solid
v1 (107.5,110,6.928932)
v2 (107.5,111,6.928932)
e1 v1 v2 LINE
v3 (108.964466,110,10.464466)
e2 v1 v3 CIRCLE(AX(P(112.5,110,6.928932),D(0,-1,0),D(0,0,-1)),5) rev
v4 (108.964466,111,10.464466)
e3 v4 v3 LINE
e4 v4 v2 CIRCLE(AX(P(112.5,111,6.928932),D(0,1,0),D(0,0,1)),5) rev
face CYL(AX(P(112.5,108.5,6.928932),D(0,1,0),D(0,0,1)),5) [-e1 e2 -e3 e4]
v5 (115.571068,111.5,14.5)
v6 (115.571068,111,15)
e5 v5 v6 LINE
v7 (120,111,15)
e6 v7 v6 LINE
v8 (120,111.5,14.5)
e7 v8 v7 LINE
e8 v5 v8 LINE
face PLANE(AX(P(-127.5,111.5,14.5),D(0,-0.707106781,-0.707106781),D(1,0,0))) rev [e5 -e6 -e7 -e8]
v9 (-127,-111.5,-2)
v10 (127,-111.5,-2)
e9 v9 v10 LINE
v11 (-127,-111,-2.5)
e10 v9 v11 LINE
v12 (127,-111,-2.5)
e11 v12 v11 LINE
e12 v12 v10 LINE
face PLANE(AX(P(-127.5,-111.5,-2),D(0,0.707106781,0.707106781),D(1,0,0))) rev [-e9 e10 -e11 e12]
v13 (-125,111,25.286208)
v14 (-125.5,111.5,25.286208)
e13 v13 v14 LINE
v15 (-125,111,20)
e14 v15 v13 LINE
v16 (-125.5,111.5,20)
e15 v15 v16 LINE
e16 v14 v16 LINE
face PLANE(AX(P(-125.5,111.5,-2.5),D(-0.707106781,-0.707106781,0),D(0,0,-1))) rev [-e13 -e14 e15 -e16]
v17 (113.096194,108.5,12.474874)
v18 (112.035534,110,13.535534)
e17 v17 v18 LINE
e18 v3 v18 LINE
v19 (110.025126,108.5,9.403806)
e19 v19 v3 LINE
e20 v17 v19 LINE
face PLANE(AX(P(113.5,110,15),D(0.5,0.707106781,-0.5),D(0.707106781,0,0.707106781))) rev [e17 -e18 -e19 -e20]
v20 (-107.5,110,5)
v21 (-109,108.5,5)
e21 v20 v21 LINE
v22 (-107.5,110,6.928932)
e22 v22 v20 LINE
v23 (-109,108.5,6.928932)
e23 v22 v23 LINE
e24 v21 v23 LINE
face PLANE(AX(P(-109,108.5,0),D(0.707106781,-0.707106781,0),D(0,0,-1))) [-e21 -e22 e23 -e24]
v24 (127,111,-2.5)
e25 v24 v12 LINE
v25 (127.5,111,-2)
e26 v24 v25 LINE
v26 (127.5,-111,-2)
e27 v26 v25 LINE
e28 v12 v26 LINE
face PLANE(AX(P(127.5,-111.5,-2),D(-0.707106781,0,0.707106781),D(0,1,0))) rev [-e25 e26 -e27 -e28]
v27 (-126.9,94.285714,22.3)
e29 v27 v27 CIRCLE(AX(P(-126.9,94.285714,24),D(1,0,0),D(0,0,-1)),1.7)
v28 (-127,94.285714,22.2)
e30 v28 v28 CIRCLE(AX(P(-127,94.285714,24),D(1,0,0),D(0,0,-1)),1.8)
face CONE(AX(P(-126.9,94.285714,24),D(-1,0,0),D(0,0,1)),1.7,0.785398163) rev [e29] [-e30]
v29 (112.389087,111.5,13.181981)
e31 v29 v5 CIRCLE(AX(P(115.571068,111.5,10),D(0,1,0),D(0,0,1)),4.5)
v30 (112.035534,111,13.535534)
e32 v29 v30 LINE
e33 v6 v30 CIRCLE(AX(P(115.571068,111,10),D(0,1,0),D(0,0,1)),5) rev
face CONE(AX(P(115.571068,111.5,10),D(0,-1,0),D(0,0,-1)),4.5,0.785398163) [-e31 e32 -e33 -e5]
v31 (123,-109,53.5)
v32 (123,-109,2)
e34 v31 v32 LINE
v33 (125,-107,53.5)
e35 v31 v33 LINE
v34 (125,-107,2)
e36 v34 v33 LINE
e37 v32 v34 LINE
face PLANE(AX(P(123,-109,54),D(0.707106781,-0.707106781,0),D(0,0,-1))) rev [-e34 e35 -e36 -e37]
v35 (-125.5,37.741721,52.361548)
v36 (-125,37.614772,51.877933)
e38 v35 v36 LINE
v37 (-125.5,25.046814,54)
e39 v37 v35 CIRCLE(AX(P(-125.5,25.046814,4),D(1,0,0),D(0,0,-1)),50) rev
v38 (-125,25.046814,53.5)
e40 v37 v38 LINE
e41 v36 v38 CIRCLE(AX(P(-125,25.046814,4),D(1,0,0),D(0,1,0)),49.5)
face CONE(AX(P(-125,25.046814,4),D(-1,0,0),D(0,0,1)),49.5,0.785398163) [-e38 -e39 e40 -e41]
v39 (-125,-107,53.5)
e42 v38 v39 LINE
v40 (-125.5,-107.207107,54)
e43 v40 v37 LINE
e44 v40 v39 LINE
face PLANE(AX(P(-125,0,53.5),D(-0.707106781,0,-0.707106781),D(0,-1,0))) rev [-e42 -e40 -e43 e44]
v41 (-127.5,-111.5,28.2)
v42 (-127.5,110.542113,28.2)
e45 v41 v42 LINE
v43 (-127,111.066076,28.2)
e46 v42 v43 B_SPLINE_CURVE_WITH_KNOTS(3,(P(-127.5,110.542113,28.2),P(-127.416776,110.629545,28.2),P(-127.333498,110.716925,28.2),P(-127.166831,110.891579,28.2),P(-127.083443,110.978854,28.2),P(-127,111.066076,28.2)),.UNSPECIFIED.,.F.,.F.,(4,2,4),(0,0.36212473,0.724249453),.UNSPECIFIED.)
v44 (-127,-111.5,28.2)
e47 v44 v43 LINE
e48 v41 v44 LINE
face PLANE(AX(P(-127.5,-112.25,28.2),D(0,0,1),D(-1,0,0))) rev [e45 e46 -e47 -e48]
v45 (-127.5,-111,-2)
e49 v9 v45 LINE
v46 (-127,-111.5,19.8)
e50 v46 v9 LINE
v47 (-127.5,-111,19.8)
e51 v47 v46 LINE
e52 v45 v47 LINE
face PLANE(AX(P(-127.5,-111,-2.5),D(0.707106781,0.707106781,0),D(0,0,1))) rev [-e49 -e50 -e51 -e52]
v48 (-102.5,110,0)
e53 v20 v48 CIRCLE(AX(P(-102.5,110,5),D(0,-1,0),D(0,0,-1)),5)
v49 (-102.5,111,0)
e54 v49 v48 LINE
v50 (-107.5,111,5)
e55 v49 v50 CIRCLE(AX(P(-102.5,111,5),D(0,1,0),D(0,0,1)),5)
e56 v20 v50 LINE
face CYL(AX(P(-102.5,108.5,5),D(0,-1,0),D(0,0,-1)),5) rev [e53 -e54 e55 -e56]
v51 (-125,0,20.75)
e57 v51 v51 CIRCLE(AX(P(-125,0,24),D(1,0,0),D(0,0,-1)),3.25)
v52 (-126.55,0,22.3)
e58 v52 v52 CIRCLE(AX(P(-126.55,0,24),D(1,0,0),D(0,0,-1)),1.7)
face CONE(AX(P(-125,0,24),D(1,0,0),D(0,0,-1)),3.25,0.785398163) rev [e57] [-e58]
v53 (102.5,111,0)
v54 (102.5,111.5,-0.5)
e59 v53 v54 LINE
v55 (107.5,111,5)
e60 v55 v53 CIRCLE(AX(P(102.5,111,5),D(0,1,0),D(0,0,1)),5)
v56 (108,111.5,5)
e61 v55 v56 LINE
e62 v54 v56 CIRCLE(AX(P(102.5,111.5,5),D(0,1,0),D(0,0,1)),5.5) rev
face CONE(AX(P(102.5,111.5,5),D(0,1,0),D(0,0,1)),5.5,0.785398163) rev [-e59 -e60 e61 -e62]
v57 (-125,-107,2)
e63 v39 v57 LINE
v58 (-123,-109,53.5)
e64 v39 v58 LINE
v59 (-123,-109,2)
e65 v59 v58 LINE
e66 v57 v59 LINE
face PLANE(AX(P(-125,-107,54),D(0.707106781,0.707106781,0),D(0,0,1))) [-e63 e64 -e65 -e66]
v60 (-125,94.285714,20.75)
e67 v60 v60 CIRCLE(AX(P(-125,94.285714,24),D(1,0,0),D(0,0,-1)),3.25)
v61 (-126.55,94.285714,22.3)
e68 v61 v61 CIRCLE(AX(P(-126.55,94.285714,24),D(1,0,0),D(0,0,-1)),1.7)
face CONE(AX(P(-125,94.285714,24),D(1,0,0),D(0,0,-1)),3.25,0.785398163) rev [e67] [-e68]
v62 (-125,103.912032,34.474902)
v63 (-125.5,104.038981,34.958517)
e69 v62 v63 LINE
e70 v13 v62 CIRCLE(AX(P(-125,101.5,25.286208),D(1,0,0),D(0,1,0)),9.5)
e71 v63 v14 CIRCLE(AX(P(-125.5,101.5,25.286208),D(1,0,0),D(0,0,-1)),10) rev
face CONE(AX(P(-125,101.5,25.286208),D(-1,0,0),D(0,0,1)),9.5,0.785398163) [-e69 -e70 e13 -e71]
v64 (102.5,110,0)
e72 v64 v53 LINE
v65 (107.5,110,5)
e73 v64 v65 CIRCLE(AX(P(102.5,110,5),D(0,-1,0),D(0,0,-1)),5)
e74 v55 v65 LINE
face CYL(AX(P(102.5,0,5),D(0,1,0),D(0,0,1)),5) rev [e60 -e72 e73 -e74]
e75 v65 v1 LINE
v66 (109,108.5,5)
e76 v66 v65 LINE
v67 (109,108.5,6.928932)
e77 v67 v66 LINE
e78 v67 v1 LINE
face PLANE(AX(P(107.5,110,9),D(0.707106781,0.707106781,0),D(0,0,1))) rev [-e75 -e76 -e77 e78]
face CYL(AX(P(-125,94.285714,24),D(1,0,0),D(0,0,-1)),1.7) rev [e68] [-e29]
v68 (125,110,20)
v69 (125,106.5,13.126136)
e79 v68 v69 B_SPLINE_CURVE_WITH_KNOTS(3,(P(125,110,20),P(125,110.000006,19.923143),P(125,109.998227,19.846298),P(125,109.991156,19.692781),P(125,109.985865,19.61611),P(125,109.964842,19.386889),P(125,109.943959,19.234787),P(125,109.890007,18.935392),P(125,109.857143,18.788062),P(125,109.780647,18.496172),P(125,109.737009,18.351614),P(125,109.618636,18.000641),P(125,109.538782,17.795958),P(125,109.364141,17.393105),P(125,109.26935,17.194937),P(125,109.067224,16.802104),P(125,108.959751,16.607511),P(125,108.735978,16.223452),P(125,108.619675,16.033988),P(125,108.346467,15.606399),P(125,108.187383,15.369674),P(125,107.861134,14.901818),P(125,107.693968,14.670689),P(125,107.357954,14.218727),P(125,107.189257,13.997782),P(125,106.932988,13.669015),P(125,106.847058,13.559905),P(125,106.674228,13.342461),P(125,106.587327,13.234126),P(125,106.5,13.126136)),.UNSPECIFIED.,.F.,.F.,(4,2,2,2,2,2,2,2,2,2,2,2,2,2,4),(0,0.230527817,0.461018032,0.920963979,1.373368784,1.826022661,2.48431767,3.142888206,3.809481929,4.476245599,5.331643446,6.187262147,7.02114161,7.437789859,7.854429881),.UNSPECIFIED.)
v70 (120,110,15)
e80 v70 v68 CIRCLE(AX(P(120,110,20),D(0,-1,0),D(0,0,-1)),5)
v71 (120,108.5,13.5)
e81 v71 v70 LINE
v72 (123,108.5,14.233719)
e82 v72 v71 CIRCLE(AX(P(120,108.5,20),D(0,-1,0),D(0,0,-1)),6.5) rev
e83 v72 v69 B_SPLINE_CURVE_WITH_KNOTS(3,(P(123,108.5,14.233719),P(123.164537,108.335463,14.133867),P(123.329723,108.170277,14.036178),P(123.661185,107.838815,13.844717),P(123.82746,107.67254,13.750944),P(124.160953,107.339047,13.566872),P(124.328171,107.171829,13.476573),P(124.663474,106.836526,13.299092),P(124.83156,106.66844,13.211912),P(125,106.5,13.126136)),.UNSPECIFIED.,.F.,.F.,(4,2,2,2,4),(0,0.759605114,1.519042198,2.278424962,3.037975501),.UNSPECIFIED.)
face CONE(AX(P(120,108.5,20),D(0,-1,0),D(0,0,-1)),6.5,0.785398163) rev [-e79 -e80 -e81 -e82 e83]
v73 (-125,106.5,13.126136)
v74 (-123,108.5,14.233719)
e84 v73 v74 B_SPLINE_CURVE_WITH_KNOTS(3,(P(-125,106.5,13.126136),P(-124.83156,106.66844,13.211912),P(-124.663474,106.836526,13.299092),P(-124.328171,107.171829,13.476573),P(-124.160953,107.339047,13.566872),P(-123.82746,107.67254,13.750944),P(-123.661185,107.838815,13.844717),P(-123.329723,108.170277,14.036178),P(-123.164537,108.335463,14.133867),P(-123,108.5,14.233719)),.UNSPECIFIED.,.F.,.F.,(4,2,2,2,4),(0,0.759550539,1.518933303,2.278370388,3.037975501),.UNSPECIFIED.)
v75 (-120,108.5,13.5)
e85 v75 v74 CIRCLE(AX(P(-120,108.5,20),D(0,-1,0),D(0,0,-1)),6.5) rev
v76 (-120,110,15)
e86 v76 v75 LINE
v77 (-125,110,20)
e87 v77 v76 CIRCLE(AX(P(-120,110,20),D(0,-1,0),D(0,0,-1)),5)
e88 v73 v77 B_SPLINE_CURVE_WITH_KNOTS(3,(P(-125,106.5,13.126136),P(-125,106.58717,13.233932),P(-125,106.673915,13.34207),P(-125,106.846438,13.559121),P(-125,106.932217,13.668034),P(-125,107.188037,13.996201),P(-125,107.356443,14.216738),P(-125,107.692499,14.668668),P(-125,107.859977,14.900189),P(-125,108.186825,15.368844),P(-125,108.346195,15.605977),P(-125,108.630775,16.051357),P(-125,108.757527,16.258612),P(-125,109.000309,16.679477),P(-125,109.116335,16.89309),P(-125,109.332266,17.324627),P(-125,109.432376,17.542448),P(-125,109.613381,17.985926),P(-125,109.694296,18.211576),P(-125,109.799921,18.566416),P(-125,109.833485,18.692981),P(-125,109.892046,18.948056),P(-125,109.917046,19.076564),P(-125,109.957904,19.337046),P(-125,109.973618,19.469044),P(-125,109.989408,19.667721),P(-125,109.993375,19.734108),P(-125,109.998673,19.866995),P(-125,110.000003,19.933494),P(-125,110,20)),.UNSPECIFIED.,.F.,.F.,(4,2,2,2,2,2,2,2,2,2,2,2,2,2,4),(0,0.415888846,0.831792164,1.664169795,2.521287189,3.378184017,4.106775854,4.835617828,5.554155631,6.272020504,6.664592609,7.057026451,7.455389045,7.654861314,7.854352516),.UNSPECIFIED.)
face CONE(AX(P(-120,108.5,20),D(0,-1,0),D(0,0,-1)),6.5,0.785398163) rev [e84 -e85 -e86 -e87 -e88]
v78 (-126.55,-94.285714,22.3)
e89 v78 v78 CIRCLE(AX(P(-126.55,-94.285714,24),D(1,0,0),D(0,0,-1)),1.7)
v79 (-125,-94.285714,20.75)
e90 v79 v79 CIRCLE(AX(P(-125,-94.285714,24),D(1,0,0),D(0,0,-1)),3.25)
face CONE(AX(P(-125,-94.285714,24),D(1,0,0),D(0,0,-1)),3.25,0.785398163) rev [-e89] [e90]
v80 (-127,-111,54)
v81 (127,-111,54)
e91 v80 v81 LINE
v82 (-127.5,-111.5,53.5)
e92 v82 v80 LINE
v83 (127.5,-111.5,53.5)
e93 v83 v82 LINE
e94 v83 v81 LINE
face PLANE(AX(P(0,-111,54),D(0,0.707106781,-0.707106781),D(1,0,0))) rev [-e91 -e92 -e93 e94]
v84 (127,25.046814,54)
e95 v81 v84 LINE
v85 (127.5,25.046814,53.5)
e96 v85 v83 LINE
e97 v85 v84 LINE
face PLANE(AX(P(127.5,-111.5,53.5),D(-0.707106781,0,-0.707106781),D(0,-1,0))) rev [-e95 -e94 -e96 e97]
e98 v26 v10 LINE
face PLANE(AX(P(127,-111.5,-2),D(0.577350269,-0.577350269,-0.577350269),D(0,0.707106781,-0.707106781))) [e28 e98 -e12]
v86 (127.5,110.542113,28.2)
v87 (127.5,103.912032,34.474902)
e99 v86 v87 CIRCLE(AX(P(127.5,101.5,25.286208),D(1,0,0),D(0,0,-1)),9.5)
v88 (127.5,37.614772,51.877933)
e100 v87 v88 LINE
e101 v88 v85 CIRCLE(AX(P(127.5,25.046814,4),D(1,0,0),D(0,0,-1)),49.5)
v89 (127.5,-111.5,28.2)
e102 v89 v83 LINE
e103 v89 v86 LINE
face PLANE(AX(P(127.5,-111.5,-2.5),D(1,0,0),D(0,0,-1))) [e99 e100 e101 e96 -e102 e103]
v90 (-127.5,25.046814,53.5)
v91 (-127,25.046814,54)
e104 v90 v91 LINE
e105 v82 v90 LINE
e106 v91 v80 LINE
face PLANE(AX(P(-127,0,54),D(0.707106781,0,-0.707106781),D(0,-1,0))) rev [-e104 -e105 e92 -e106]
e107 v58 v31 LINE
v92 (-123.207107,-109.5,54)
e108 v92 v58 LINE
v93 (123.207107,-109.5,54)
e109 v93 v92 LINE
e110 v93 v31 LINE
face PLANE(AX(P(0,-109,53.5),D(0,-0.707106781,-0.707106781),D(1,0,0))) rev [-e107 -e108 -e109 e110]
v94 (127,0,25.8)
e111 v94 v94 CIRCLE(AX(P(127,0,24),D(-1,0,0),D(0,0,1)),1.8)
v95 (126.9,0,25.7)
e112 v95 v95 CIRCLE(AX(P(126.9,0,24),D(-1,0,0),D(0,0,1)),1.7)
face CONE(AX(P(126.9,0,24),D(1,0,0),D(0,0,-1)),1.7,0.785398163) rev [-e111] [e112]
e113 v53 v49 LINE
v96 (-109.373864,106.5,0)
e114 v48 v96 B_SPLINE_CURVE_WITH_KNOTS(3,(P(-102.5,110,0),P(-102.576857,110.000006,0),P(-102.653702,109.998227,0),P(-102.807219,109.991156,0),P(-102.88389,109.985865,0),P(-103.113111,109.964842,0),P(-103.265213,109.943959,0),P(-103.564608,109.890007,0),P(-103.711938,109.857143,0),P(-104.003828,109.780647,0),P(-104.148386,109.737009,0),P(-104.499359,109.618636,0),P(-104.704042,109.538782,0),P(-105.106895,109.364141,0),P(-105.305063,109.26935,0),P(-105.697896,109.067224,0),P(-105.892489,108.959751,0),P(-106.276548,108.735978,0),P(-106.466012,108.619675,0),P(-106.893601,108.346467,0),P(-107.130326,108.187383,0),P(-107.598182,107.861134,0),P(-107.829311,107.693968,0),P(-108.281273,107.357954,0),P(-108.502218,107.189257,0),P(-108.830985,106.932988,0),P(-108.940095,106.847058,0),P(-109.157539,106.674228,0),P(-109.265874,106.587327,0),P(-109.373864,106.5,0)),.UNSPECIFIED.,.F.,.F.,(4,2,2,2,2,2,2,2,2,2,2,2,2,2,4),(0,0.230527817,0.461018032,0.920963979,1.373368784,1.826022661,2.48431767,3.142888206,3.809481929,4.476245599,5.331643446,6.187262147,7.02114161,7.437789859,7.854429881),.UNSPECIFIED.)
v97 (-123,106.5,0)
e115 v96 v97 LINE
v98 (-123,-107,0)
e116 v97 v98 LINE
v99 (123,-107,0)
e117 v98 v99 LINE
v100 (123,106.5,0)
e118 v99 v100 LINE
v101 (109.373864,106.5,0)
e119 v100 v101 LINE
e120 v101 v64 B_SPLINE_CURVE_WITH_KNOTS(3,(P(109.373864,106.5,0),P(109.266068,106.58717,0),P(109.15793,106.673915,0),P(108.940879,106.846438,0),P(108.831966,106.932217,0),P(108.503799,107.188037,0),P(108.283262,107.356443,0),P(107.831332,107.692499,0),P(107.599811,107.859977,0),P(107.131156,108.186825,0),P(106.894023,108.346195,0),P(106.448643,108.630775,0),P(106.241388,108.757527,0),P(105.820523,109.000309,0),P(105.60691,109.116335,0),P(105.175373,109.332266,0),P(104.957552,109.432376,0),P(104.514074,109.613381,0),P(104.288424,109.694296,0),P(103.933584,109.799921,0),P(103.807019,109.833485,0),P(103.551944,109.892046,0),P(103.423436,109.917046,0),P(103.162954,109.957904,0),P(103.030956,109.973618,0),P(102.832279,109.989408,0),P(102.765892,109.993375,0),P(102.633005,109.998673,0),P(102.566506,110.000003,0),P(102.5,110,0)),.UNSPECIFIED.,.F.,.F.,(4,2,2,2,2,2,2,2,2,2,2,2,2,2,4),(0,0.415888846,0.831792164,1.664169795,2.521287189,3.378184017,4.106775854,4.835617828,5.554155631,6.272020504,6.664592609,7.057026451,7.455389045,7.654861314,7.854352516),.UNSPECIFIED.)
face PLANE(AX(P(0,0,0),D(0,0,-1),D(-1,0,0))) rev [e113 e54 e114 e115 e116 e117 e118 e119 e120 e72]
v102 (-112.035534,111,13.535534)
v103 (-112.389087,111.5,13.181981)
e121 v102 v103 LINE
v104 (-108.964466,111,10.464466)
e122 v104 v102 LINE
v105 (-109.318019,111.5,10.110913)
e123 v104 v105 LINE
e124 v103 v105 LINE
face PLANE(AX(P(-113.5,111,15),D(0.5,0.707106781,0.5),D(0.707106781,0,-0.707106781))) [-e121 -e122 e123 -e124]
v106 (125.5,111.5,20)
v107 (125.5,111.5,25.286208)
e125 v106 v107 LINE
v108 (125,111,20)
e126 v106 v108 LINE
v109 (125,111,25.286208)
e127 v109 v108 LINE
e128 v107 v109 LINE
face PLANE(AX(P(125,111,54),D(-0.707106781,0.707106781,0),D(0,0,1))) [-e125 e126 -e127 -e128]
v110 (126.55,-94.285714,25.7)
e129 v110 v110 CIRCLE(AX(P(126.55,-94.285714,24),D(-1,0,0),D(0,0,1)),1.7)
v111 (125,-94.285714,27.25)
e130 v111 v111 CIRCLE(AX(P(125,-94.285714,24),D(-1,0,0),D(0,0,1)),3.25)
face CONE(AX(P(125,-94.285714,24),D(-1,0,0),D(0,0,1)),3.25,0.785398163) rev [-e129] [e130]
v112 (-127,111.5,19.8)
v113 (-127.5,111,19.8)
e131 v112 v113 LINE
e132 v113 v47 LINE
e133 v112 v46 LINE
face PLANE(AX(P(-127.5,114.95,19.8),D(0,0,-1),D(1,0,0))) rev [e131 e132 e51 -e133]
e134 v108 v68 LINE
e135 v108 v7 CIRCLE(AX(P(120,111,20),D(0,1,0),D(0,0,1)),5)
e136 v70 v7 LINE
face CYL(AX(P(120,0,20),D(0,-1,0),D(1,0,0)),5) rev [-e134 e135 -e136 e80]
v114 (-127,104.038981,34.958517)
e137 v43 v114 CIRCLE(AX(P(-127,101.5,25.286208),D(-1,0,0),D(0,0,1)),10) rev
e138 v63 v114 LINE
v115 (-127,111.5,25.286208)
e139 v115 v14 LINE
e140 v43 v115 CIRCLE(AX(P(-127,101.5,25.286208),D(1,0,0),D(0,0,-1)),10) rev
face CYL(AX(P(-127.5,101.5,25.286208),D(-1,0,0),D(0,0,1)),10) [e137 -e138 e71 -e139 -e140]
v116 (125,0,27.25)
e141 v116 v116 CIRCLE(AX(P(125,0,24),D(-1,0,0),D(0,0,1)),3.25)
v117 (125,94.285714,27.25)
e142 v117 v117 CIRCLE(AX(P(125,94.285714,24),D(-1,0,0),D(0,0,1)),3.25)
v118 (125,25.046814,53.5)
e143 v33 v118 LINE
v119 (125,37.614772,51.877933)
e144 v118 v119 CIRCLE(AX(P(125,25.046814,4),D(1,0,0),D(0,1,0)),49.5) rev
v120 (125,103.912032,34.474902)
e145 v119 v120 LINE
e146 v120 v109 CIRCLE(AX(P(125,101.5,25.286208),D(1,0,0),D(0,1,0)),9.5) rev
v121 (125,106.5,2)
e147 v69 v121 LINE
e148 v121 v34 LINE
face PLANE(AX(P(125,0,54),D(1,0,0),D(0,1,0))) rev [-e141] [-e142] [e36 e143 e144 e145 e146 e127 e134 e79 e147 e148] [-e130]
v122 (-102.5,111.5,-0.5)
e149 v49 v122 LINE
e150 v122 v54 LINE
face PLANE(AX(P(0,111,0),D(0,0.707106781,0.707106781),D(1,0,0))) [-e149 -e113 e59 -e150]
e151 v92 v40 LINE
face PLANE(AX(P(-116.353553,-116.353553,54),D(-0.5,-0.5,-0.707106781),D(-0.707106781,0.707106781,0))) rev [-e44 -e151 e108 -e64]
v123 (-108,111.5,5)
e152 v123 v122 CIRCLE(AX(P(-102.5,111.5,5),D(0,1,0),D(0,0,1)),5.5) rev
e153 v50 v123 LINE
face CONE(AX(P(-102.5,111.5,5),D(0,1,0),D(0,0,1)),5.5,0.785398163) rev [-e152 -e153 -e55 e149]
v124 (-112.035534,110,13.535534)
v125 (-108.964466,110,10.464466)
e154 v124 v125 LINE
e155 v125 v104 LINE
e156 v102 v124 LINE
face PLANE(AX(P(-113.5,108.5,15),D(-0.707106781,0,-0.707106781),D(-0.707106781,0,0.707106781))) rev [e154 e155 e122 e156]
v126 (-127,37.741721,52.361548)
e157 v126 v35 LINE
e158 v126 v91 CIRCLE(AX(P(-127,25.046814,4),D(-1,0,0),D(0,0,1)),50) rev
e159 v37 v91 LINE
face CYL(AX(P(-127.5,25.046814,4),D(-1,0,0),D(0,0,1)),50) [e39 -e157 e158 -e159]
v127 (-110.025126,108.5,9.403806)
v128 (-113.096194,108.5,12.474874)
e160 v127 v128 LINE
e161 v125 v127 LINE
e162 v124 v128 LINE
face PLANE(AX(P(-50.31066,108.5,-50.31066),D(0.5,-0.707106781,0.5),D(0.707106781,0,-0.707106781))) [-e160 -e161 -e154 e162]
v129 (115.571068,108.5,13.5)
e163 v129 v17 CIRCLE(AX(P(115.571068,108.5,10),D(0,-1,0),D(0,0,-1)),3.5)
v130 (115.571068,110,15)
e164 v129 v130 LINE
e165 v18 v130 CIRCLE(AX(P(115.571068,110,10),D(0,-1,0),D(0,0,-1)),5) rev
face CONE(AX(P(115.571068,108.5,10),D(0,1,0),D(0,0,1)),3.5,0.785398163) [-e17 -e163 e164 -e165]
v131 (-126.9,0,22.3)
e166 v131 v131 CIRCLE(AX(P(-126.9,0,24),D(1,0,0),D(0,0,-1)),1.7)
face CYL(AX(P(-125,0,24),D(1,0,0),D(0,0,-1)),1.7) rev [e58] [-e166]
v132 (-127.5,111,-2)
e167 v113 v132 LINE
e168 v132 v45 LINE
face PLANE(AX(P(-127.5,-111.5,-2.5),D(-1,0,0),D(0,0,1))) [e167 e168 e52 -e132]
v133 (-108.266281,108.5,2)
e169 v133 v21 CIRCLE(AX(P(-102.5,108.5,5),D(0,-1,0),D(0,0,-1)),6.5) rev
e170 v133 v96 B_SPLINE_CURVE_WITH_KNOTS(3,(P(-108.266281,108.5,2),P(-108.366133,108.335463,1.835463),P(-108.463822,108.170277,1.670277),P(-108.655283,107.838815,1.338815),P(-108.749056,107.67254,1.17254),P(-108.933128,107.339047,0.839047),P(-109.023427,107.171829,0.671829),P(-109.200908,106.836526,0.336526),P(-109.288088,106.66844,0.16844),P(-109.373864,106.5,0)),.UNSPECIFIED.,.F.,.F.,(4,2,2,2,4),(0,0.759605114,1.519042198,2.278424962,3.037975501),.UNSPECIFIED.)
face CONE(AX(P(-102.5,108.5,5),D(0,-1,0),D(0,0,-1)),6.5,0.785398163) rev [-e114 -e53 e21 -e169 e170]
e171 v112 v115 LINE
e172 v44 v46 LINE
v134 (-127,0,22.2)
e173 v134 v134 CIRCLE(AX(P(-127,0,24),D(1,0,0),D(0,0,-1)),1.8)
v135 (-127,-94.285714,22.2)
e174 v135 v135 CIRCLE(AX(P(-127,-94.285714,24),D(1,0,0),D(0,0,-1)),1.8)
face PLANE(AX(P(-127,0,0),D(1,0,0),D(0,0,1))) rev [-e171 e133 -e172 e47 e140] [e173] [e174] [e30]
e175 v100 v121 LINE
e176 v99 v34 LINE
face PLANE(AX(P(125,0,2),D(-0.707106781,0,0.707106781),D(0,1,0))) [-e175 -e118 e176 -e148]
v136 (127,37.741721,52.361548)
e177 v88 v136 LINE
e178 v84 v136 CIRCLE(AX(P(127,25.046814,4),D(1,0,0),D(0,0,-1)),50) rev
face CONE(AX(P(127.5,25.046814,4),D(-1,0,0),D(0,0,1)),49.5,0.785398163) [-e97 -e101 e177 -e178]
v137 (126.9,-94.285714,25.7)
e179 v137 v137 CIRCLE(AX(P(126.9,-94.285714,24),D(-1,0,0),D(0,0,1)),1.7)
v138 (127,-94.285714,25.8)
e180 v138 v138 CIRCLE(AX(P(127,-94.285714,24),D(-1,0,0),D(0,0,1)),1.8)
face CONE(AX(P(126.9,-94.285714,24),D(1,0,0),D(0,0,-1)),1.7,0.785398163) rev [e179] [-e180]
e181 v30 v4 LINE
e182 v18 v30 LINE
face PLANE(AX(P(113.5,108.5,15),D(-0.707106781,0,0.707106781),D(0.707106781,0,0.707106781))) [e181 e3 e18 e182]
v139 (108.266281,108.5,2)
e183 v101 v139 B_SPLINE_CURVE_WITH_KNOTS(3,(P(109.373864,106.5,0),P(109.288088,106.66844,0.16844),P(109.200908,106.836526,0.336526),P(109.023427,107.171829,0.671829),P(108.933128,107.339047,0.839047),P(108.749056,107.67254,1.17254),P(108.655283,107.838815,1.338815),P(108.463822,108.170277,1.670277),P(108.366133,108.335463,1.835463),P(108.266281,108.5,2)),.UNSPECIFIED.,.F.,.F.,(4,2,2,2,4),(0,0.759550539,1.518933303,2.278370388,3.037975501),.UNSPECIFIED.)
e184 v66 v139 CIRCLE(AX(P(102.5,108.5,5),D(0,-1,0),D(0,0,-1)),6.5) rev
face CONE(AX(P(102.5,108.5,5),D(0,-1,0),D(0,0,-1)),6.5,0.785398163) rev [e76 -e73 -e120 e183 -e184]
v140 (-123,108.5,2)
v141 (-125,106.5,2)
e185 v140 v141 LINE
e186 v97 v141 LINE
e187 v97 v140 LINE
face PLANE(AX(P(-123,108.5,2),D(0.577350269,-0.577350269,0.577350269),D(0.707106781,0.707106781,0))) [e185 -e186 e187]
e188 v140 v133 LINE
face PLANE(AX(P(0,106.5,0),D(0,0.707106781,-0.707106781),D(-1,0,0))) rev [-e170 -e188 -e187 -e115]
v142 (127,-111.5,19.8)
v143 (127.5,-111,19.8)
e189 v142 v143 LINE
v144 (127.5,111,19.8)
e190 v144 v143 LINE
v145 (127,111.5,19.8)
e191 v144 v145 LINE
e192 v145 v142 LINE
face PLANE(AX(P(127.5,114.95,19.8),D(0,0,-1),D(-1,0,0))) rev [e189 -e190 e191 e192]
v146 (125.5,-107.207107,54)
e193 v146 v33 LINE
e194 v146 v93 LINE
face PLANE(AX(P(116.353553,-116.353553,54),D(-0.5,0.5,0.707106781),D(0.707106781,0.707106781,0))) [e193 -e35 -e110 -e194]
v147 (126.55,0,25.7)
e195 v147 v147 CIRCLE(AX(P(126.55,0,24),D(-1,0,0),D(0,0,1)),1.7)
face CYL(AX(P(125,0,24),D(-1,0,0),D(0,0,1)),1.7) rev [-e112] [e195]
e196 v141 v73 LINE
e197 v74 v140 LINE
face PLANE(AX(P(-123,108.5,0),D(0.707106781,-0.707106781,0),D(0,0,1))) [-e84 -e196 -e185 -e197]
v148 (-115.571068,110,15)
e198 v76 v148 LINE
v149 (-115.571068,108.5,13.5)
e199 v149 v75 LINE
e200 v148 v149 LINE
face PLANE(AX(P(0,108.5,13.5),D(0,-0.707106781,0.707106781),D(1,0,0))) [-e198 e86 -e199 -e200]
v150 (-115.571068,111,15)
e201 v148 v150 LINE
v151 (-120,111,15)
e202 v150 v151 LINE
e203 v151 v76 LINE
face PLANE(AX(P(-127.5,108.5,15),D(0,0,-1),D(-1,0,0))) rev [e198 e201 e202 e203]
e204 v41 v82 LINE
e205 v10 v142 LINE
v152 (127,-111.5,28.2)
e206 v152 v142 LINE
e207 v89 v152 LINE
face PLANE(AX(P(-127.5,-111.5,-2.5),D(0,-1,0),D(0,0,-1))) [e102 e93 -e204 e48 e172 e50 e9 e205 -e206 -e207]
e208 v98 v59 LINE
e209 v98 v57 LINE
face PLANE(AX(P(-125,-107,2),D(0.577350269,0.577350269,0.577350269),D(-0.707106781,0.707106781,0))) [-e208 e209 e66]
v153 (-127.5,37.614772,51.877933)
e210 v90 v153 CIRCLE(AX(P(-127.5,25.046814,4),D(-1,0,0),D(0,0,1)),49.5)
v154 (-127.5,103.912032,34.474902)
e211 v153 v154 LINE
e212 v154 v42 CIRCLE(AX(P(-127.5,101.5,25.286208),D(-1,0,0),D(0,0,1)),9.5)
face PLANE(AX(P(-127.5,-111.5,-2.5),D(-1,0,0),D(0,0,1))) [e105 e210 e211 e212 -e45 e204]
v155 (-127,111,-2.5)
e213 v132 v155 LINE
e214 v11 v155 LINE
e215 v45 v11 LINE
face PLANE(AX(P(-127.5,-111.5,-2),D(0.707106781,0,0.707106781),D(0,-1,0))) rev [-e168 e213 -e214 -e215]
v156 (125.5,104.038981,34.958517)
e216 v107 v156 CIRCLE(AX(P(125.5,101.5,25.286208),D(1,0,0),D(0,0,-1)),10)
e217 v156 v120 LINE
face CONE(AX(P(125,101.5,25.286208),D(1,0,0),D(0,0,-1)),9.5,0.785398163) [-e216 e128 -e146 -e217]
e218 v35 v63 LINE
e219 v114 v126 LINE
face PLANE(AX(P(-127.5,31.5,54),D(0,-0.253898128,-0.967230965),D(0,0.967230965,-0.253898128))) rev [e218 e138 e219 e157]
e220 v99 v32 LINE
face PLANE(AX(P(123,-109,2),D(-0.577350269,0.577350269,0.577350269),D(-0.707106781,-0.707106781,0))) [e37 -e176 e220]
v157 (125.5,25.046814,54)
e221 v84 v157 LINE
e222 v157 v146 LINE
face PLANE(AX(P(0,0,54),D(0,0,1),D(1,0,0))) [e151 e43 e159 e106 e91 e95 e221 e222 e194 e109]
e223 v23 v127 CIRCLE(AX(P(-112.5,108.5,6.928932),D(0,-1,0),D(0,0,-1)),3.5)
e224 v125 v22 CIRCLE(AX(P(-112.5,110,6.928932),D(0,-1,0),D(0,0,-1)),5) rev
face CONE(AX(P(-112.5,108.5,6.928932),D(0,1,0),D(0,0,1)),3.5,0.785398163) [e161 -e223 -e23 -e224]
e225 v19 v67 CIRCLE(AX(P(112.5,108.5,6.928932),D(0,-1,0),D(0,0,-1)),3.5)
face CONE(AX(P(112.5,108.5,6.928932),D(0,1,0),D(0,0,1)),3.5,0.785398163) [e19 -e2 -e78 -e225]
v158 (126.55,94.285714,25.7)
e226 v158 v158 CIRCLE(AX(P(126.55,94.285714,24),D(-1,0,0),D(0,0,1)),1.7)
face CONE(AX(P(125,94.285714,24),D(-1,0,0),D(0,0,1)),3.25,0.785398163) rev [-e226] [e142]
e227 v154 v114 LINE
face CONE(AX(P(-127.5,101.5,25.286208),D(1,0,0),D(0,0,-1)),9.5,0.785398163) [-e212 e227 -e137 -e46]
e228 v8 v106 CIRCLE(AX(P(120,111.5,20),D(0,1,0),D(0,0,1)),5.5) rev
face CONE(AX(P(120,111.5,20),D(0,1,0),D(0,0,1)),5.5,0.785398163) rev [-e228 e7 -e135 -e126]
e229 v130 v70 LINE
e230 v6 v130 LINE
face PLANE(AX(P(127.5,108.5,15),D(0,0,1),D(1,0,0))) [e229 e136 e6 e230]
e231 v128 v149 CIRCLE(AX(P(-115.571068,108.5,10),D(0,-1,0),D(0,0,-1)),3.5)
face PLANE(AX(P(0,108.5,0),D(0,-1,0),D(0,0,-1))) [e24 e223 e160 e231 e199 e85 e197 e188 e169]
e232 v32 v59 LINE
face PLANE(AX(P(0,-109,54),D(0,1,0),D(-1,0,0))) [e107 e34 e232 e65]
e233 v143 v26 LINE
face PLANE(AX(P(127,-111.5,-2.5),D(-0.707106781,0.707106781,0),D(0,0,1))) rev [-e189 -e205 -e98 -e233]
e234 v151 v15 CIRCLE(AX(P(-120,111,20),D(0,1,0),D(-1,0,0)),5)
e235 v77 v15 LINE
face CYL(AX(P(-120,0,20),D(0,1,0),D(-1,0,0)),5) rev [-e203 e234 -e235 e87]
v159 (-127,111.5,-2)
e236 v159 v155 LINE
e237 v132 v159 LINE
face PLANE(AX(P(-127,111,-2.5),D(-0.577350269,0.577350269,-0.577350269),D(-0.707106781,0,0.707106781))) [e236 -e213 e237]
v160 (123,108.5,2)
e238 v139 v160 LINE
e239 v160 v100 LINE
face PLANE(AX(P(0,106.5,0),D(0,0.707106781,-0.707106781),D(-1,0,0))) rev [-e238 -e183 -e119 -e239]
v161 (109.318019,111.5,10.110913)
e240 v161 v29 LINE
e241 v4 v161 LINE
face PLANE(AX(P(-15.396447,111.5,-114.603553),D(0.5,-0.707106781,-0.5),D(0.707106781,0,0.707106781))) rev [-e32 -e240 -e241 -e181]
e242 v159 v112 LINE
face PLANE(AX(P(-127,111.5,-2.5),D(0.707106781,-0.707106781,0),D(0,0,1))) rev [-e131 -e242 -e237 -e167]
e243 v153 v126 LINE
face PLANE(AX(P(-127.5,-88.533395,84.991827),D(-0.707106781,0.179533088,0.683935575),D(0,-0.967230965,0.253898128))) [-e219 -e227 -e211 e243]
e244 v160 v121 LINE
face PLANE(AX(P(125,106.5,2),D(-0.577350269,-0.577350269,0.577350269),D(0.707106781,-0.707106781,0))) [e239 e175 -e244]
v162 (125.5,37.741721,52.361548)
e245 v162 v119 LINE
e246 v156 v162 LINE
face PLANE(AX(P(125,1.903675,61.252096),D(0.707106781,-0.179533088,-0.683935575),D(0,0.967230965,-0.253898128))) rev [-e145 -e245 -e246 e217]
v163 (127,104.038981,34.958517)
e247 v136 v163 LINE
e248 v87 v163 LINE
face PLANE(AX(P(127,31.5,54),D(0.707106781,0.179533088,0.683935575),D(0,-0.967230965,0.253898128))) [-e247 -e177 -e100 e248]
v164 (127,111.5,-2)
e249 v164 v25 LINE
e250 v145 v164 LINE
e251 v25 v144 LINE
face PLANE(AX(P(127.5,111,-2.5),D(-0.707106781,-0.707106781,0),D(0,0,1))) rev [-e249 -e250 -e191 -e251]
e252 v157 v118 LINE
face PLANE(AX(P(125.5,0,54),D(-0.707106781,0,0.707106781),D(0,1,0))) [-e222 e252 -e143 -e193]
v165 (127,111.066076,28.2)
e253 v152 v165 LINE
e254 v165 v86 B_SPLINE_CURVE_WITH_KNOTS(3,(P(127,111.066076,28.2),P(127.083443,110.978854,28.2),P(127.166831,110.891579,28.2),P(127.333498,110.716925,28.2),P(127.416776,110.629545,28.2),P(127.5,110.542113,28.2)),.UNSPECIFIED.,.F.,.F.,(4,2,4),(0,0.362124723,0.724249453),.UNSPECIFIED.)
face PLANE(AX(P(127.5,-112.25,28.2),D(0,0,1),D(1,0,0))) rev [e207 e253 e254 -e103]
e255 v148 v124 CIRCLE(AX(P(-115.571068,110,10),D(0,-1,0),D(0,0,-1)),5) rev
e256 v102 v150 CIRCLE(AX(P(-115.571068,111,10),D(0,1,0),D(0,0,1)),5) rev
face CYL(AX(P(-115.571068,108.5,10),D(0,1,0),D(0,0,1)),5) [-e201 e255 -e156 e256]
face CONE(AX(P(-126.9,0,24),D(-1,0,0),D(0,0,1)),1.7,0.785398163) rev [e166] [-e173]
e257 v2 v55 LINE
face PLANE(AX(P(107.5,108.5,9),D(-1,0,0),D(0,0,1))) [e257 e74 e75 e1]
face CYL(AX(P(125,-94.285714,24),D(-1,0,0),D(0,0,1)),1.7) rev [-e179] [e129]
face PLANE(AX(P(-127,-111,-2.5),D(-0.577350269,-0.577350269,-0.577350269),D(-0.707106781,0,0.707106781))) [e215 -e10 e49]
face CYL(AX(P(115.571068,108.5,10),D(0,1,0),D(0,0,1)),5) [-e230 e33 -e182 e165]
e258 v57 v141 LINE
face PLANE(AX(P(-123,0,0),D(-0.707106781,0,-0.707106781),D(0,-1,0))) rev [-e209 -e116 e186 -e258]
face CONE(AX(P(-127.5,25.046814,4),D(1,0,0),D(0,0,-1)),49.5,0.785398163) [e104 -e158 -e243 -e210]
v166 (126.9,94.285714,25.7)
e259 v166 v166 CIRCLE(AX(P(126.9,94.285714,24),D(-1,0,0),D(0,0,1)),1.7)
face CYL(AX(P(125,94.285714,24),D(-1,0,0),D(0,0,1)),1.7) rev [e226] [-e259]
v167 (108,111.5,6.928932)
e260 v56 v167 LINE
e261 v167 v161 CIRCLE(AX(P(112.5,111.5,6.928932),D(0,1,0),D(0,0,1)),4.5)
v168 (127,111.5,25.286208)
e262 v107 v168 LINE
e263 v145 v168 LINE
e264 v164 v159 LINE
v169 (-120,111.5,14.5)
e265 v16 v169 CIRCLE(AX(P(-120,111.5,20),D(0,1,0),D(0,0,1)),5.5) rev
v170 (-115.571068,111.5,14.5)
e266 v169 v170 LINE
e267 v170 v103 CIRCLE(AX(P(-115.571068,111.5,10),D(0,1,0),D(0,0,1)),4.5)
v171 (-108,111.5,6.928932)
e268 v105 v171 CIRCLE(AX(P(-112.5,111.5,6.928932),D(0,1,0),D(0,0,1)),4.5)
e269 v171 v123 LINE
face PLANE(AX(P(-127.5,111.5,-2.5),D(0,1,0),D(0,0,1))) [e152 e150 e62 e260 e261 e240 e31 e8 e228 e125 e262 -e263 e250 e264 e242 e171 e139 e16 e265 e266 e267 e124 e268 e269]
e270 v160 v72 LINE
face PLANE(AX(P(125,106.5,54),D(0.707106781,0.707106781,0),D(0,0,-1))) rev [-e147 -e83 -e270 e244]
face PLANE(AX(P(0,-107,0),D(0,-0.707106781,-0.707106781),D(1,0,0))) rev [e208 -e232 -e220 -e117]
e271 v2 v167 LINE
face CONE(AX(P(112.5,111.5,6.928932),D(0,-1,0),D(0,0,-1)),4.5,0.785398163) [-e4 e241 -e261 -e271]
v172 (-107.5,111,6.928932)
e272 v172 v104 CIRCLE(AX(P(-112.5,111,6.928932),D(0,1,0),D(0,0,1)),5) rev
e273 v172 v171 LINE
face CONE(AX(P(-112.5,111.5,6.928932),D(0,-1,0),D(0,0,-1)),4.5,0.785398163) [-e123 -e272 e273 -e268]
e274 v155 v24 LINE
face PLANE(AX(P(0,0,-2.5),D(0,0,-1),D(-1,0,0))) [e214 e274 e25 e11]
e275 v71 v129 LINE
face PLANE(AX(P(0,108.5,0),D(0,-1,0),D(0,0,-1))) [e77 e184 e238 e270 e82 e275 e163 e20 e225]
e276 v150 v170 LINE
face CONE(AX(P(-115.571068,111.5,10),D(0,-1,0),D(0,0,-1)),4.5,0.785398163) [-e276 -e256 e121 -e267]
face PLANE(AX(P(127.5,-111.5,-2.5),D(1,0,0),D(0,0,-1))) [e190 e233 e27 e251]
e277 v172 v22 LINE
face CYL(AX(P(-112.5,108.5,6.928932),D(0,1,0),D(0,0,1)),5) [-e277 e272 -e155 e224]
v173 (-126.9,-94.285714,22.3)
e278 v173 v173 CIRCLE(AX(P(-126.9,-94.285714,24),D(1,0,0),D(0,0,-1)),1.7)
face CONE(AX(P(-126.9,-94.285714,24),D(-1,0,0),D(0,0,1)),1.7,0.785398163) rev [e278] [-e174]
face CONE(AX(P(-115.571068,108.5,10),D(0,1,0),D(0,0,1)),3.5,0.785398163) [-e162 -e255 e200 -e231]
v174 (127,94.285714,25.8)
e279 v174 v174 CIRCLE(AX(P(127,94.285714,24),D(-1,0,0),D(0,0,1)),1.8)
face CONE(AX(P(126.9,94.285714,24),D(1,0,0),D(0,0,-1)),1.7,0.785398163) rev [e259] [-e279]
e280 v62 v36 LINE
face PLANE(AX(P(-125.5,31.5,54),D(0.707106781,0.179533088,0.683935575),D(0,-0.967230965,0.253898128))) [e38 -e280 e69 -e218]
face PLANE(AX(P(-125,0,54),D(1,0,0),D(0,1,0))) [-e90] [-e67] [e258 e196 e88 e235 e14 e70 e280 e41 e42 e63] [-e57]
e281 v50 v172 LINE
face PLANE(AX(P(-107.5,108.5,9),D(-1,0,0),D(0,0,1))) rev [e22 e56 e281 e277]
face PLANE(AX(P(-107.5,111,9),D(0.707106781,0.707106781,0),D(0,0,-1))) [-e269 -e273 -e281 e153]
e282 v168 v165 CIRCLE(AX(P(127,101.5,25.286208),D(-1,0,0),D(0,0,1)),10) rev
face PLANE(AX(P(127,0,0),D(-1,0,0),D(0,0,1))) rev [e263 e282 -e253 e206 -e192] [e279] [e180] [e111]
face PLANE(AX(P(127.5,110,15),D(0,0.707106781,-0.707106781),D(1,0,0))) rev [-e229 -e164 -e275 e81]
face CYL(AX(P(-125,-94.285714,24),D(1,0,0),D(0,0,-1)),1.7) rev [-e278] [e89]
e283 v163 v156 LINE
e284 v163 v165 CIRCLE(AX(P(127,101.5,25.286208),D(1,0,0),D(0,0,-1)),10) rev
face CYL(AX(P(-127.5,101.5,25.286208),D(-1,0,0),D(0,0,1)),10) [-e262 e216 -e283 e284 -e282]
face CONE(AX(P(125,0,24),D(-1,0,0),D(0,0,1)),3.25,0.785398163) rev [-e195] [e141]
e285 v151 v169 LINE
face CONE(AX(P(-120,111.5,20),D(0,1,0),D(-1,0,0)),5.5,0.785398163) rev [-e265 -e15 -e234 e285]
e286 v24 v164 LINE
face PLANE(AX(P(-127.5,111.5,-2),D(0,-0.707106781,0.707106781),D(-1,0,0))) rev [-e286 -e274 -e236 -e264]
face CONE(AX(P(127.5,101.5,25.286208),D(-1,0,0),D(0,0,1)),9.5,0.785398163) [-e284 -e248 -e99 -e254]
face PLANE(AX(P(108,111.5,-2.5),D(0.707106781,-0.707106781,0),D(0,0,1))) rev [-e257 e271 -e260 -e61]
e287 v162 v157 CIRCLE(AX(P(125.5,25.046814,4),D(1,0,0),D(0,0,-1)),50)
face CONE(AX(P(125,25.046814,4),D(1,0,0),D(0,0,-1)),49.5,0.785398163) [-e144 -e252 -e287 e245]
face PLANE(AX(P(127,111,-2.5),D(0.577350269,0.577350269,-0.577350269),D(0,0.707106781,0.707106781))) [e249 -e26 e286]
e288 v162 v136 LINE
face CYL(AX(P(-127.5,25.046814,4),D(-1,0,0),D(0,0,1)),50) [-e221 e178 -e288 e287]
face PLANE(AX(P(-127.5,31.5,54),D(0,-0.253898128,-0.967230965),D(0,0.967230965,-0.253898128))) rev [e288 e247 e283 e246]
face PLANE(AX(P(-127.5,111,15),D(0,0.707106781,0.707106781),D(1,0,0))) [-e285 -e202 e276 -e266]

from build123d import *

# Parameters (mm, degrees)
SKETCH1_W                                      = 255
SKETCH1_H                                      = 223
BOSS_EXTRUDE1_DEPTH                            = 2.5
SKETCH2_W                                      = 2.5
SKETCH2_H                                      = 223
SKETCH2_W_2                                    = 250
SKETCH2_H_2                                    = 2.5
BOSS_EXTRUDE2_DEPTH                            = 54
FRONT_TAPER_DEPTH                              = 178.776545135
FRONT_TAPER_DEPTH_BACK                         = 178.776545135
HOLD_IN_TAB_DEPTH                              = 3
SKETCH6_W                                      = 8.4
SKETCH6_H                                      = 227.2
MOUNTING_POCKET_DEPTH                          = 284.052115343
CSK_FOR_M3_FLAT_HEAD_MACHINE_SCREW1_AT_2_COUNT = 2
CSK_FOR_M3_FLAT_HEAD_MACHINE_SCREW1_AT_2_PITCH = 94.285714286
CSK_FOR_M3_FLAT_HEAD_MACHINE_SCREW1_AT_3_COUNT = 2
CSK_FOR_M3_FLAT_HEAD_MACHINE_SCREW1_AT_3_PITCH = 188.571428571
FILLET2_R                                      = 5
FILLET3_R                                      = 10
FILLET4_R                                      = 50
INSERT_CHAMS_SIZE                              = 1.5
INSIDE_CHAMS_SIZE                              = 2
DEBURS_SIZE                                    = 0.5


with BuildPart() as part:
    # Sketch1 → Boss-Extrude1 (new body)
    with BuildSketch(Plane.XY):
        Rectangle(SKETCH1_W, SKETCH1_H)
    extrude(amount=-BOSS_EXTRUDE1_DEPTH)

    # Sketch2 → Boss-Extrude2 (add)
    with BuildSketch(Plane.XY):
        with Locations((-126.25, 0)):
            Rectangle(SKETCH2_W, SKETCH2_H)
        with Locations((0, -110.25)):
            Rectangle(SKETCH2_W_2, SKETCH2_H_2)
        with Locations((126.25, 0)):
            Rectangle(SKETCH2_W, SKETCH2_H)
    extrude(amount=BOSS_EXTRUDE2_DEPTH)

    # Sketch5 → Front Taper (cut, two sides: drawn at the far end of the back side and taken through both)
    with BuildSketch(Plane(origin=(0, 0, 0), x_dir=(0, 0, -1), z_dir=(1, 0, 0)).offset(-FRONT_TAPER_DEPTH_BACK)):
        Polygon((-54, 31.5), (-33, 111.5), (-54, 111.5), align=None)
    extrude(amount=FRONT_TAPER_DEPTH + FRONT_TAPER_DEPTH_BACK, mode=Mode.SUBTRACT)

    # Sketch10 → Hold In Tab (add)
    with BuildSketch(Plane(origin=(0, 111.5, 0), x_dir=(1, 0, 0), z_dir=(0, 1, 0))):
        Polygon((127.5, -15), (113.5, -15), (107.5, -9), (107.5, 2.5), (127.5, 2.5), align=None)
    hold_in_tab = extrude(amount=-HOLD_IN_TAB_DEPTH)

    # Hold Tabs: Hold In Tab across plane
    add(hold_in_tab.mirror(Plane(origin=(0, 0, 0), x_dir=(0, 0, 1), z_dir=(1, 0, 0))))

    # Sketch6 → Mounting Pocket (cut, through all)
    with BuildSketch(Plane.ZY.offset(-127)):
        with Locations((24, 1.35)):
            Rectangle(SKETCH6_W, SKETCH6_H)
    mounting_pocket = extrude(amount=-MOUNTING_POCKET_DEPTH, mode=Mode.SUBTRACT)

    # Mounting Pockets: Mounting Pocket across plane
    add(mounting_pocket.mirror(Plane(origin=(0, 0, 0), x_dir=(0, 0, 1), z_dir=(1, 0, 0))), mode=Mode.SUBTRACT)

    # Sketch9 → CSK for M3 Flat Head Machine Screw1 (revolve, cut)
    with BuildSketch(Plane(origin=(125, -94.285714286, 24), x_dir=(0, 0, 1), z_dir=(0, 1, 0))):
        Polygon((0, 0), (0, 2), (1.8, 2), (1.7, 1.9), (1.7, 1.55), (3.25, 0), align=None)
    csk_for_m3_flat_head_machine_screw1 = revolve(axis=Axis((118.65, -94.285714286, 24), (1, 0, 0)), mode=Mode.SUBTRACT)

    # CSK for M3 Flat Head Machine Screw1 at 2: CSK for M3 Flat Head Machine Screw1 ×2
    with Locations(*[(0, i * CSK_FOR_M3_FLAT_HEAD_MACHINE_SCREW1_AT_2_PITCH, 0) for i in range(1, CSK_FOR_M3_FLAT_HEAD_MACHINE_SCREW1_AT_2_COUNT)]):
        add(csk_for_m3_flat_head_machine_screw1, mode=Mode.SUBTRACT)

    # CSK for M3 Flat Head Machine Screw1 at 3: CSK for M3 Flat Head Machine Screw1 ×2
    with Locations(*[(0, i * CSK_FOR_M3_FLAT_HEAD_MACHINE_SCREW1_AT_3_PITCH, 0) for i in range(1, CSK_FOR_M3_FLAT_HEAD_MACHINE_SCREW1_AT_3_COUNT)]):
        add(csk_for_m3_flat_head_machine_screw1, mode=Mode.SUBTRACT)

    # Mounting Screw Holes: CSK for M3 Flat Head Machine Screw1 across plane
    add(csk_for_m3_flat_head_machine_screw1.mirror(Plane(origin=(0, 0, 0), x_dir=(0, 0, 1), z_dir=(1, 0, 0))), mode=Mode.SUBTRACT)

    # Mounting Screw Holes copy 1 sketch → Mounting Screw Holes copy 1 (revolve, cut)
    with BuildSketch(Plane(origin=(-125, 0, 24), x_dir=(0, 0, 1), z_dir=(0, 1, 0))):
        Polygon((0, 0), (0, -2), (1.8, -2), (1.7, -1.9), (1.7, -1.55), (3.25, 0), align=None)
    revolve(axis=Axis((-118.65, 0, 24), (1, 0, 0)), mode=Mode.SUBTRACT)

    # Mounting Screw Holes copy 2 sketch → Mounting Screw Holes copy 2 (revolve, cut)
    with BuildSketch(Plane(origin=(-125, 94.285714286, 24), x_dir=(0, 0, 1), z_dir=(0, 1, 0))):
        Polygon((0, 0), (0, -2), (1.8, -2), (1.7, -1.9), (1.7, -1.55), (3.25, 0), align=None)
    revolve(axis=Axis((-118.65, 94.285714286, 24), (1, 0, 0)), mode=Mode.SUBTRACT)

    # Fillet2
    fillet2_edges = [part.edges().sort_by_distance(p)[0] for p in [
        (125, 110, 15),
        (107.5, 110, 0),
        (107.5, 110, 9),
        (113.5, 110, 15),
        (-125, 110, 15),
        (-107.5, 110, 0),
        (-107.5, 110, 9),
        (-113.5, 110, 15),
    ]]
    fillet(fillet2_edges, radius=FILLET2_R)

    # Fillet3
    fillet3_edges = [part.edges().sort_by_distance(p)[0] for p in [
        (-126.25, 111.5, 33),
        (126.25, 111.5, 33),
    ]]
    fillet(fillet3_edges, radius=FILLET3_R)

    # Fillet4
    fillet4_edges = [part.edges().sort_by_distance(p)[0] for p in [
        (126.25, 31.5, 54),
        (-126.25, 31.5, 54),
    ]]
    fillet(fillet4_edges, radius=FILLET4_R)

    # Insert Chams
    # the kernel refuses this chamfer: 1.5 mm, written as the material it takes off along each edge
    with BuildSketch(Plane(origin=(-112.035533906, 108.5, 13.535533906), x_dir=(0.01944252080601449, 0.9996219169112968, 0.01944252080601441), z_dir=(0.7071067811865461, 0, -0.707106781186549)), Plane(origin=(112.035533906, 108.5, 13.535533906), x_dir=(0.706839436070675, -0.02749587661058209, -0.7068394360706722), z_dir=(-0.7071067811865461, 0, -0.707106781186549))) as insert_chams_piece_1:
        Polygon((INSERT_CHAMS_SIZE * 0.999621916911, -INSERT_CHAMS_SIZE * 0.0274958766106), (-INSERT_CHAMS_SIZE * 0.0274958766106, -INSERT_CHAMS_SIZE * 0.999621916911), (0, 0), align=None)
    extrude(amount=4.343145751, mode=Mode.SUBTRACT)
    with BuildSketch(Plane(origin=(-107.5, 108.5, 6.928932188), x_dir=(0.027495876610582292, 0.9996219169112969, 0), z_dir=(0, 0, -1)), Plane(origin=(107.5, 108.5, 6.928932188), x_dir=(0.9996219169112969, -0.027495876610582292, 0), z_dir=(0, 0, -1))) as insert_chams_piece_2:
        Polygon((INSERT_CHAMS_SIZE * 0.999621916911, -INSERT_CHAMS_SIZE * 0.0274958766106), (-INSERT_CHAMS_SIZE * 0.0274958766106, -INSERT_CHAMS_SIZE * 0.999621916911), (0, 0), align=None)
    extrude(amount=1.928932188, mode=Mode.SUBTRACT)
    with BuildSketch(Plane(origin=(-120, 108.5, 15), x_dir=(0, 0.9996219169112968, 0.027495876610586893), z_dir=(1, 0, 0)), Plane(origin=(120, 108.5, 15), x_dir=(0, -0.027495876610582164, -0.9996219169112969), z_dir=(-1, 0, 0))) as insert_chams_piece_3:
        Polygon((INSERT_CHAMS_SIZE * 0.999621916911, -INSERT_CHAMS_SIZE * 0.0274958766106), (-INSERT_CHAMS_SIZE * 0.0274958766106, -INSERT_CHAMS_SIZE * 0.999621916911), (0, 0), align=None)
    extrude(amount=4.428932188, mode=Mode.SUBTRACT)
    with BuildSketch(Plane(origin=(-115.571067812, 108.5, 10), x_dir=(0, 0, 1), z_dir=(-1, 0, 0))) as insert_chams_piece_4:
        Polygon((5, INSERT_CHAMS_SIZE), (5 - INSERT_CHAMS_SIZE, 0), (5, 0), align=None)
    revolve(axis=Axis((-115.571067812, 108.5, 10), (0, 1, 0)), revolution_arc=45, mode=Mode.SUBTRACT)
    with BuildSketch(Plane(origin=(-112.5, 108.5, 6.928932188), x_dir=(1, 0, 0), z_dir=(0, 0, -1))) as insert_chams_piece_5:
        Polygon((5, -INSERT_CHAMS_SIZE), (5 - INSERT_CHAMS_SIZE, 0), (5, 0), align=None)
    revolve(axis=Axis((-112.5, 108.5, 6.928932188), (0, -1, 0)), revolution_arc=45, mode=Mode.SUBTRACT)
    with BuildSketch(Plane(origin=(115.571067812, 108.5, 10), x_dir=(0, 0, 1), z_dir=(1, 0, 0))) as insert_chams_piece_6:
        Polygon((5 - INSERT_CHAMS_SIZE, 0), (5, -INSERT_CHAMS_SIZE), (5, 0), align=None)
    revolve(axis=Axis((115.571067812, 108.5, 10), (0, -1, 0)), revolution_arc=45, mode=Mode.SUBTRACT)
    with BuildSketch(Plane(origin=(112.5, 108.5, 6.928932188), x_dir=(-0.7071067811865478, 0, 0.7071067811865472), z_dir=(0.7071067811865472, 0, 0.7071067811865478))) as insert_chams_piece_7:
        Polygon((5 - INSERT_CHAMS_SIZE, 0), (5, -INSERT_CHAMS_SIZE), (5, 0), align=None)
    revolve(axis=Axis((112.5, 108.5, 6.928932188), (0, -1, 0)), revolution_arc=45, mode=Mode.SUBTRACT)
    with BuildSketch(Plane(origin=(-120, 108.5, 20), x_dir=(-0.7166461305573681, 0, 0.6974369674437623), z_dir=(0.6974369674437623, 0, 0.7166461305573681))) as insert_chams_piece_8_section:
        Polygon((5, -INSERT_CHAMS_SIZE), (5 + INSERT_CHAMS_SIZE, 0), (5, 0), align=None)
    insert_chams_piece_8 = revolve(axis=Axis((-120, 108.5, 20), (0, -1, 0)), revolution_arc=134.221731534, mode=Mode.PRIVATE)
    insert_chams_piece_8 = split(insert_chams_piece_8, bisect_by=Plane(origin=(-125, 109.058393583, 16.326998509), z_dir=(1, 0, 0)), keep=Keep.TOP, mode=Mode.PRIVATE)
    add(insert_chams_piece_8, mode=Mode.SUBTRACT)
    with BuildSketch(Plane(origin=(-102.5, 108.5, 5), x_dir=(0.6974369674437586, 0, -0.7166461305573718), z_dir=(0.7166461305573718, 0, 0.6974369674437586))) as insert_chams_piece_9_section:
        Polygon((5, INSERT_CHAMS_SIZE), (5 + INSERT_CHAMS_SIZE, 0), (5, 0), align=None)
    insert_chams_piece_9 = revolve(axis=Axis((-102.5, 108.5, 5), (0, 1, 0)), revolution_arc=134.221731534, mode=Mode.PRIVATE)
    insert_chams_piece_9 = split(insert_chams_piece_9, bisect_by=Plane(origin=(-106.173001491, 109.058393583, 0), z_dir=(0, 0, 1)), keep=Keep.TOP, mode=Mode.PRIVATE)
    add(insert_chams_piece_9, mode=Mode.SUBTRACT)
    with BuildSketch(Plane(origin=(102.5, 108.5, 5), x_dir=(-0.6974369674437586, 0, -0.7166461305573718), z_dir=(-0.7166461305573718, 0, 0.6974369674437586))) as insert_chams_piece_10_section:
        Polygon((5 + INSERT_CHAMS_SIZE, 0), (5, -INSERT_CHAMS_SIZE), (5, 0), align=None)
    insert_chams_piece_10 = revolve(axis=Axis((102.5, 108.5, 5), (0, -1, 0)), revolution_arc=134.221731534, mode=Mode.PRIVATE)
    insert_chams_piece_10 = split(insert_chams_piece_10, bisect_by=Plane(origin=(106.173001491, 109.058393583, 0), z_dir=(0, 0, 1)), keep=Keep.TOP, mode=Mode.PRIVATE)
    add(insert_chams_piece_10, mode=Mode.SUBTRACT)
    with BuildSketch(Plane(origin=(120, 108.5, 20), x_dir=(0.716646130557371, 0, 0.6974369674437595), z_dir=(-0.6974369674437595, 0, 0.716646130557371))) as insert_chams_piece_11_section:
        Polygon((5, INSERT_CHAMS_SIZE), (5 + INSERT_CHAMS_SIZE, 0), (5, 0), align=None)
    insert_chams_piece_11 = revolve(axis=Axis((120, 108.5, 20), (0, 1, 0)), revolution_arc=134.221731534, mode=Mode.PRIVATE)
    insert_chams_piece_11 = split(insert_chams_piece_11, bisect_by=Plane(origin=(125, 109.058393583, 16.326998509), z_dir=(-1, 0, 0)), keep=Keep.TOP, mode=Mode.PRIVATE)
    add(insert_chams_piece_11, mode=Mode.SUBTRACT)

    # Inside Chams
    inside_chams_edges = [part.edges().sort_by_distance(p)[0] for p in [
        (-125, -109, 27),
        (125, -109, 27),
        (0, -109, 0),
        (-125, 108.5, 7.923344034),
        (-115.826655966, 108.5, 0),
        (125, 108.5, 7.923344034),
        (125, -0.25, 0),
        (115.826655966, 108.5, 0),
        (-125, -0.25, 0),
    ]]
    chamfer(inside_chams_edges, length=INSIDE_CHAMS_SIZE)

    # Deburs
    deburs_edges = [part.edges().sort_by_distance(p)[0] for p in [
        (-127.5, 0, -2.5),
        (0, -111.5, -2.5),
        (0, -111.5, 54),
        (-110.5, 111.5, 12),
        (-117.785533906, 111.5, 15),
        (-107.5, 111.5, 5.964466094),
        (0, 111.5, 0),
        (107.5, 111.5, 5.964466094),
        (110.5, 111.5, 12),
        (117.785533906, 111.5, 15),
        (113.65765065, 111.5, 14.619397663),
        (107.880602337, 111.5, 8.84234935),
        (-113.65765065, 111.5, 14.619397663),
        (-107.880602337, 111.5, 8.84234935),
        (-123.535533906, 111.5, 16.464466094),
        (-106.035533906, 111.5, 1.464466094),
        (106.035533906, 111.5, 1.464466094),
        (123.535533906, 111.5, 16.464466094),
        (125, 111.5, 22.64310388),
        (-125, 111.5, 22.64310388),
        (-125, 109.418011519, 31.393997341),
        (-127.5, 108.431990614, 32.493669596),
        (127.5, 108.431990614, 32.493669596),
        (125, 109.418011519, 31.393997341),
        (-125, 70.890351082, 43.660032841),
        (-127.5, 70.890351082, 43.660032841),
        (-125, -40.97659277, 54),
        (-125, 31.446915496, 53.588695352),
        (-127.5, -43.22659277, 54),
        (127.5, -43.22659277, 54),
        (125, -40.97659277, 54),
        (-127.5, 31.446915496, 53.588695352),
        (127.5, 70.890351082, 43.660032841),
        (125, 70.890351082, 43.660032841),
        (127.5, 31.446915496, 53.588695352),
        (125, 31.446915496, 53.588695352),
        (0, -109, 54),
        (-124, -108, 54),
        (124, -108, 54),
        (127.5, 0, -2.5),
        (127.5, -111.5, 8.65),
        (-127.5, -111.5, 8.65),
        (-127.5, 111.5, 8.65),
        (127.5, 111.5, 8.65),
        (0, 111.5, -2.5),
    ]]
    chamfer(deburs_edges, length=DEBURS_SIZE)


solid = part.part
